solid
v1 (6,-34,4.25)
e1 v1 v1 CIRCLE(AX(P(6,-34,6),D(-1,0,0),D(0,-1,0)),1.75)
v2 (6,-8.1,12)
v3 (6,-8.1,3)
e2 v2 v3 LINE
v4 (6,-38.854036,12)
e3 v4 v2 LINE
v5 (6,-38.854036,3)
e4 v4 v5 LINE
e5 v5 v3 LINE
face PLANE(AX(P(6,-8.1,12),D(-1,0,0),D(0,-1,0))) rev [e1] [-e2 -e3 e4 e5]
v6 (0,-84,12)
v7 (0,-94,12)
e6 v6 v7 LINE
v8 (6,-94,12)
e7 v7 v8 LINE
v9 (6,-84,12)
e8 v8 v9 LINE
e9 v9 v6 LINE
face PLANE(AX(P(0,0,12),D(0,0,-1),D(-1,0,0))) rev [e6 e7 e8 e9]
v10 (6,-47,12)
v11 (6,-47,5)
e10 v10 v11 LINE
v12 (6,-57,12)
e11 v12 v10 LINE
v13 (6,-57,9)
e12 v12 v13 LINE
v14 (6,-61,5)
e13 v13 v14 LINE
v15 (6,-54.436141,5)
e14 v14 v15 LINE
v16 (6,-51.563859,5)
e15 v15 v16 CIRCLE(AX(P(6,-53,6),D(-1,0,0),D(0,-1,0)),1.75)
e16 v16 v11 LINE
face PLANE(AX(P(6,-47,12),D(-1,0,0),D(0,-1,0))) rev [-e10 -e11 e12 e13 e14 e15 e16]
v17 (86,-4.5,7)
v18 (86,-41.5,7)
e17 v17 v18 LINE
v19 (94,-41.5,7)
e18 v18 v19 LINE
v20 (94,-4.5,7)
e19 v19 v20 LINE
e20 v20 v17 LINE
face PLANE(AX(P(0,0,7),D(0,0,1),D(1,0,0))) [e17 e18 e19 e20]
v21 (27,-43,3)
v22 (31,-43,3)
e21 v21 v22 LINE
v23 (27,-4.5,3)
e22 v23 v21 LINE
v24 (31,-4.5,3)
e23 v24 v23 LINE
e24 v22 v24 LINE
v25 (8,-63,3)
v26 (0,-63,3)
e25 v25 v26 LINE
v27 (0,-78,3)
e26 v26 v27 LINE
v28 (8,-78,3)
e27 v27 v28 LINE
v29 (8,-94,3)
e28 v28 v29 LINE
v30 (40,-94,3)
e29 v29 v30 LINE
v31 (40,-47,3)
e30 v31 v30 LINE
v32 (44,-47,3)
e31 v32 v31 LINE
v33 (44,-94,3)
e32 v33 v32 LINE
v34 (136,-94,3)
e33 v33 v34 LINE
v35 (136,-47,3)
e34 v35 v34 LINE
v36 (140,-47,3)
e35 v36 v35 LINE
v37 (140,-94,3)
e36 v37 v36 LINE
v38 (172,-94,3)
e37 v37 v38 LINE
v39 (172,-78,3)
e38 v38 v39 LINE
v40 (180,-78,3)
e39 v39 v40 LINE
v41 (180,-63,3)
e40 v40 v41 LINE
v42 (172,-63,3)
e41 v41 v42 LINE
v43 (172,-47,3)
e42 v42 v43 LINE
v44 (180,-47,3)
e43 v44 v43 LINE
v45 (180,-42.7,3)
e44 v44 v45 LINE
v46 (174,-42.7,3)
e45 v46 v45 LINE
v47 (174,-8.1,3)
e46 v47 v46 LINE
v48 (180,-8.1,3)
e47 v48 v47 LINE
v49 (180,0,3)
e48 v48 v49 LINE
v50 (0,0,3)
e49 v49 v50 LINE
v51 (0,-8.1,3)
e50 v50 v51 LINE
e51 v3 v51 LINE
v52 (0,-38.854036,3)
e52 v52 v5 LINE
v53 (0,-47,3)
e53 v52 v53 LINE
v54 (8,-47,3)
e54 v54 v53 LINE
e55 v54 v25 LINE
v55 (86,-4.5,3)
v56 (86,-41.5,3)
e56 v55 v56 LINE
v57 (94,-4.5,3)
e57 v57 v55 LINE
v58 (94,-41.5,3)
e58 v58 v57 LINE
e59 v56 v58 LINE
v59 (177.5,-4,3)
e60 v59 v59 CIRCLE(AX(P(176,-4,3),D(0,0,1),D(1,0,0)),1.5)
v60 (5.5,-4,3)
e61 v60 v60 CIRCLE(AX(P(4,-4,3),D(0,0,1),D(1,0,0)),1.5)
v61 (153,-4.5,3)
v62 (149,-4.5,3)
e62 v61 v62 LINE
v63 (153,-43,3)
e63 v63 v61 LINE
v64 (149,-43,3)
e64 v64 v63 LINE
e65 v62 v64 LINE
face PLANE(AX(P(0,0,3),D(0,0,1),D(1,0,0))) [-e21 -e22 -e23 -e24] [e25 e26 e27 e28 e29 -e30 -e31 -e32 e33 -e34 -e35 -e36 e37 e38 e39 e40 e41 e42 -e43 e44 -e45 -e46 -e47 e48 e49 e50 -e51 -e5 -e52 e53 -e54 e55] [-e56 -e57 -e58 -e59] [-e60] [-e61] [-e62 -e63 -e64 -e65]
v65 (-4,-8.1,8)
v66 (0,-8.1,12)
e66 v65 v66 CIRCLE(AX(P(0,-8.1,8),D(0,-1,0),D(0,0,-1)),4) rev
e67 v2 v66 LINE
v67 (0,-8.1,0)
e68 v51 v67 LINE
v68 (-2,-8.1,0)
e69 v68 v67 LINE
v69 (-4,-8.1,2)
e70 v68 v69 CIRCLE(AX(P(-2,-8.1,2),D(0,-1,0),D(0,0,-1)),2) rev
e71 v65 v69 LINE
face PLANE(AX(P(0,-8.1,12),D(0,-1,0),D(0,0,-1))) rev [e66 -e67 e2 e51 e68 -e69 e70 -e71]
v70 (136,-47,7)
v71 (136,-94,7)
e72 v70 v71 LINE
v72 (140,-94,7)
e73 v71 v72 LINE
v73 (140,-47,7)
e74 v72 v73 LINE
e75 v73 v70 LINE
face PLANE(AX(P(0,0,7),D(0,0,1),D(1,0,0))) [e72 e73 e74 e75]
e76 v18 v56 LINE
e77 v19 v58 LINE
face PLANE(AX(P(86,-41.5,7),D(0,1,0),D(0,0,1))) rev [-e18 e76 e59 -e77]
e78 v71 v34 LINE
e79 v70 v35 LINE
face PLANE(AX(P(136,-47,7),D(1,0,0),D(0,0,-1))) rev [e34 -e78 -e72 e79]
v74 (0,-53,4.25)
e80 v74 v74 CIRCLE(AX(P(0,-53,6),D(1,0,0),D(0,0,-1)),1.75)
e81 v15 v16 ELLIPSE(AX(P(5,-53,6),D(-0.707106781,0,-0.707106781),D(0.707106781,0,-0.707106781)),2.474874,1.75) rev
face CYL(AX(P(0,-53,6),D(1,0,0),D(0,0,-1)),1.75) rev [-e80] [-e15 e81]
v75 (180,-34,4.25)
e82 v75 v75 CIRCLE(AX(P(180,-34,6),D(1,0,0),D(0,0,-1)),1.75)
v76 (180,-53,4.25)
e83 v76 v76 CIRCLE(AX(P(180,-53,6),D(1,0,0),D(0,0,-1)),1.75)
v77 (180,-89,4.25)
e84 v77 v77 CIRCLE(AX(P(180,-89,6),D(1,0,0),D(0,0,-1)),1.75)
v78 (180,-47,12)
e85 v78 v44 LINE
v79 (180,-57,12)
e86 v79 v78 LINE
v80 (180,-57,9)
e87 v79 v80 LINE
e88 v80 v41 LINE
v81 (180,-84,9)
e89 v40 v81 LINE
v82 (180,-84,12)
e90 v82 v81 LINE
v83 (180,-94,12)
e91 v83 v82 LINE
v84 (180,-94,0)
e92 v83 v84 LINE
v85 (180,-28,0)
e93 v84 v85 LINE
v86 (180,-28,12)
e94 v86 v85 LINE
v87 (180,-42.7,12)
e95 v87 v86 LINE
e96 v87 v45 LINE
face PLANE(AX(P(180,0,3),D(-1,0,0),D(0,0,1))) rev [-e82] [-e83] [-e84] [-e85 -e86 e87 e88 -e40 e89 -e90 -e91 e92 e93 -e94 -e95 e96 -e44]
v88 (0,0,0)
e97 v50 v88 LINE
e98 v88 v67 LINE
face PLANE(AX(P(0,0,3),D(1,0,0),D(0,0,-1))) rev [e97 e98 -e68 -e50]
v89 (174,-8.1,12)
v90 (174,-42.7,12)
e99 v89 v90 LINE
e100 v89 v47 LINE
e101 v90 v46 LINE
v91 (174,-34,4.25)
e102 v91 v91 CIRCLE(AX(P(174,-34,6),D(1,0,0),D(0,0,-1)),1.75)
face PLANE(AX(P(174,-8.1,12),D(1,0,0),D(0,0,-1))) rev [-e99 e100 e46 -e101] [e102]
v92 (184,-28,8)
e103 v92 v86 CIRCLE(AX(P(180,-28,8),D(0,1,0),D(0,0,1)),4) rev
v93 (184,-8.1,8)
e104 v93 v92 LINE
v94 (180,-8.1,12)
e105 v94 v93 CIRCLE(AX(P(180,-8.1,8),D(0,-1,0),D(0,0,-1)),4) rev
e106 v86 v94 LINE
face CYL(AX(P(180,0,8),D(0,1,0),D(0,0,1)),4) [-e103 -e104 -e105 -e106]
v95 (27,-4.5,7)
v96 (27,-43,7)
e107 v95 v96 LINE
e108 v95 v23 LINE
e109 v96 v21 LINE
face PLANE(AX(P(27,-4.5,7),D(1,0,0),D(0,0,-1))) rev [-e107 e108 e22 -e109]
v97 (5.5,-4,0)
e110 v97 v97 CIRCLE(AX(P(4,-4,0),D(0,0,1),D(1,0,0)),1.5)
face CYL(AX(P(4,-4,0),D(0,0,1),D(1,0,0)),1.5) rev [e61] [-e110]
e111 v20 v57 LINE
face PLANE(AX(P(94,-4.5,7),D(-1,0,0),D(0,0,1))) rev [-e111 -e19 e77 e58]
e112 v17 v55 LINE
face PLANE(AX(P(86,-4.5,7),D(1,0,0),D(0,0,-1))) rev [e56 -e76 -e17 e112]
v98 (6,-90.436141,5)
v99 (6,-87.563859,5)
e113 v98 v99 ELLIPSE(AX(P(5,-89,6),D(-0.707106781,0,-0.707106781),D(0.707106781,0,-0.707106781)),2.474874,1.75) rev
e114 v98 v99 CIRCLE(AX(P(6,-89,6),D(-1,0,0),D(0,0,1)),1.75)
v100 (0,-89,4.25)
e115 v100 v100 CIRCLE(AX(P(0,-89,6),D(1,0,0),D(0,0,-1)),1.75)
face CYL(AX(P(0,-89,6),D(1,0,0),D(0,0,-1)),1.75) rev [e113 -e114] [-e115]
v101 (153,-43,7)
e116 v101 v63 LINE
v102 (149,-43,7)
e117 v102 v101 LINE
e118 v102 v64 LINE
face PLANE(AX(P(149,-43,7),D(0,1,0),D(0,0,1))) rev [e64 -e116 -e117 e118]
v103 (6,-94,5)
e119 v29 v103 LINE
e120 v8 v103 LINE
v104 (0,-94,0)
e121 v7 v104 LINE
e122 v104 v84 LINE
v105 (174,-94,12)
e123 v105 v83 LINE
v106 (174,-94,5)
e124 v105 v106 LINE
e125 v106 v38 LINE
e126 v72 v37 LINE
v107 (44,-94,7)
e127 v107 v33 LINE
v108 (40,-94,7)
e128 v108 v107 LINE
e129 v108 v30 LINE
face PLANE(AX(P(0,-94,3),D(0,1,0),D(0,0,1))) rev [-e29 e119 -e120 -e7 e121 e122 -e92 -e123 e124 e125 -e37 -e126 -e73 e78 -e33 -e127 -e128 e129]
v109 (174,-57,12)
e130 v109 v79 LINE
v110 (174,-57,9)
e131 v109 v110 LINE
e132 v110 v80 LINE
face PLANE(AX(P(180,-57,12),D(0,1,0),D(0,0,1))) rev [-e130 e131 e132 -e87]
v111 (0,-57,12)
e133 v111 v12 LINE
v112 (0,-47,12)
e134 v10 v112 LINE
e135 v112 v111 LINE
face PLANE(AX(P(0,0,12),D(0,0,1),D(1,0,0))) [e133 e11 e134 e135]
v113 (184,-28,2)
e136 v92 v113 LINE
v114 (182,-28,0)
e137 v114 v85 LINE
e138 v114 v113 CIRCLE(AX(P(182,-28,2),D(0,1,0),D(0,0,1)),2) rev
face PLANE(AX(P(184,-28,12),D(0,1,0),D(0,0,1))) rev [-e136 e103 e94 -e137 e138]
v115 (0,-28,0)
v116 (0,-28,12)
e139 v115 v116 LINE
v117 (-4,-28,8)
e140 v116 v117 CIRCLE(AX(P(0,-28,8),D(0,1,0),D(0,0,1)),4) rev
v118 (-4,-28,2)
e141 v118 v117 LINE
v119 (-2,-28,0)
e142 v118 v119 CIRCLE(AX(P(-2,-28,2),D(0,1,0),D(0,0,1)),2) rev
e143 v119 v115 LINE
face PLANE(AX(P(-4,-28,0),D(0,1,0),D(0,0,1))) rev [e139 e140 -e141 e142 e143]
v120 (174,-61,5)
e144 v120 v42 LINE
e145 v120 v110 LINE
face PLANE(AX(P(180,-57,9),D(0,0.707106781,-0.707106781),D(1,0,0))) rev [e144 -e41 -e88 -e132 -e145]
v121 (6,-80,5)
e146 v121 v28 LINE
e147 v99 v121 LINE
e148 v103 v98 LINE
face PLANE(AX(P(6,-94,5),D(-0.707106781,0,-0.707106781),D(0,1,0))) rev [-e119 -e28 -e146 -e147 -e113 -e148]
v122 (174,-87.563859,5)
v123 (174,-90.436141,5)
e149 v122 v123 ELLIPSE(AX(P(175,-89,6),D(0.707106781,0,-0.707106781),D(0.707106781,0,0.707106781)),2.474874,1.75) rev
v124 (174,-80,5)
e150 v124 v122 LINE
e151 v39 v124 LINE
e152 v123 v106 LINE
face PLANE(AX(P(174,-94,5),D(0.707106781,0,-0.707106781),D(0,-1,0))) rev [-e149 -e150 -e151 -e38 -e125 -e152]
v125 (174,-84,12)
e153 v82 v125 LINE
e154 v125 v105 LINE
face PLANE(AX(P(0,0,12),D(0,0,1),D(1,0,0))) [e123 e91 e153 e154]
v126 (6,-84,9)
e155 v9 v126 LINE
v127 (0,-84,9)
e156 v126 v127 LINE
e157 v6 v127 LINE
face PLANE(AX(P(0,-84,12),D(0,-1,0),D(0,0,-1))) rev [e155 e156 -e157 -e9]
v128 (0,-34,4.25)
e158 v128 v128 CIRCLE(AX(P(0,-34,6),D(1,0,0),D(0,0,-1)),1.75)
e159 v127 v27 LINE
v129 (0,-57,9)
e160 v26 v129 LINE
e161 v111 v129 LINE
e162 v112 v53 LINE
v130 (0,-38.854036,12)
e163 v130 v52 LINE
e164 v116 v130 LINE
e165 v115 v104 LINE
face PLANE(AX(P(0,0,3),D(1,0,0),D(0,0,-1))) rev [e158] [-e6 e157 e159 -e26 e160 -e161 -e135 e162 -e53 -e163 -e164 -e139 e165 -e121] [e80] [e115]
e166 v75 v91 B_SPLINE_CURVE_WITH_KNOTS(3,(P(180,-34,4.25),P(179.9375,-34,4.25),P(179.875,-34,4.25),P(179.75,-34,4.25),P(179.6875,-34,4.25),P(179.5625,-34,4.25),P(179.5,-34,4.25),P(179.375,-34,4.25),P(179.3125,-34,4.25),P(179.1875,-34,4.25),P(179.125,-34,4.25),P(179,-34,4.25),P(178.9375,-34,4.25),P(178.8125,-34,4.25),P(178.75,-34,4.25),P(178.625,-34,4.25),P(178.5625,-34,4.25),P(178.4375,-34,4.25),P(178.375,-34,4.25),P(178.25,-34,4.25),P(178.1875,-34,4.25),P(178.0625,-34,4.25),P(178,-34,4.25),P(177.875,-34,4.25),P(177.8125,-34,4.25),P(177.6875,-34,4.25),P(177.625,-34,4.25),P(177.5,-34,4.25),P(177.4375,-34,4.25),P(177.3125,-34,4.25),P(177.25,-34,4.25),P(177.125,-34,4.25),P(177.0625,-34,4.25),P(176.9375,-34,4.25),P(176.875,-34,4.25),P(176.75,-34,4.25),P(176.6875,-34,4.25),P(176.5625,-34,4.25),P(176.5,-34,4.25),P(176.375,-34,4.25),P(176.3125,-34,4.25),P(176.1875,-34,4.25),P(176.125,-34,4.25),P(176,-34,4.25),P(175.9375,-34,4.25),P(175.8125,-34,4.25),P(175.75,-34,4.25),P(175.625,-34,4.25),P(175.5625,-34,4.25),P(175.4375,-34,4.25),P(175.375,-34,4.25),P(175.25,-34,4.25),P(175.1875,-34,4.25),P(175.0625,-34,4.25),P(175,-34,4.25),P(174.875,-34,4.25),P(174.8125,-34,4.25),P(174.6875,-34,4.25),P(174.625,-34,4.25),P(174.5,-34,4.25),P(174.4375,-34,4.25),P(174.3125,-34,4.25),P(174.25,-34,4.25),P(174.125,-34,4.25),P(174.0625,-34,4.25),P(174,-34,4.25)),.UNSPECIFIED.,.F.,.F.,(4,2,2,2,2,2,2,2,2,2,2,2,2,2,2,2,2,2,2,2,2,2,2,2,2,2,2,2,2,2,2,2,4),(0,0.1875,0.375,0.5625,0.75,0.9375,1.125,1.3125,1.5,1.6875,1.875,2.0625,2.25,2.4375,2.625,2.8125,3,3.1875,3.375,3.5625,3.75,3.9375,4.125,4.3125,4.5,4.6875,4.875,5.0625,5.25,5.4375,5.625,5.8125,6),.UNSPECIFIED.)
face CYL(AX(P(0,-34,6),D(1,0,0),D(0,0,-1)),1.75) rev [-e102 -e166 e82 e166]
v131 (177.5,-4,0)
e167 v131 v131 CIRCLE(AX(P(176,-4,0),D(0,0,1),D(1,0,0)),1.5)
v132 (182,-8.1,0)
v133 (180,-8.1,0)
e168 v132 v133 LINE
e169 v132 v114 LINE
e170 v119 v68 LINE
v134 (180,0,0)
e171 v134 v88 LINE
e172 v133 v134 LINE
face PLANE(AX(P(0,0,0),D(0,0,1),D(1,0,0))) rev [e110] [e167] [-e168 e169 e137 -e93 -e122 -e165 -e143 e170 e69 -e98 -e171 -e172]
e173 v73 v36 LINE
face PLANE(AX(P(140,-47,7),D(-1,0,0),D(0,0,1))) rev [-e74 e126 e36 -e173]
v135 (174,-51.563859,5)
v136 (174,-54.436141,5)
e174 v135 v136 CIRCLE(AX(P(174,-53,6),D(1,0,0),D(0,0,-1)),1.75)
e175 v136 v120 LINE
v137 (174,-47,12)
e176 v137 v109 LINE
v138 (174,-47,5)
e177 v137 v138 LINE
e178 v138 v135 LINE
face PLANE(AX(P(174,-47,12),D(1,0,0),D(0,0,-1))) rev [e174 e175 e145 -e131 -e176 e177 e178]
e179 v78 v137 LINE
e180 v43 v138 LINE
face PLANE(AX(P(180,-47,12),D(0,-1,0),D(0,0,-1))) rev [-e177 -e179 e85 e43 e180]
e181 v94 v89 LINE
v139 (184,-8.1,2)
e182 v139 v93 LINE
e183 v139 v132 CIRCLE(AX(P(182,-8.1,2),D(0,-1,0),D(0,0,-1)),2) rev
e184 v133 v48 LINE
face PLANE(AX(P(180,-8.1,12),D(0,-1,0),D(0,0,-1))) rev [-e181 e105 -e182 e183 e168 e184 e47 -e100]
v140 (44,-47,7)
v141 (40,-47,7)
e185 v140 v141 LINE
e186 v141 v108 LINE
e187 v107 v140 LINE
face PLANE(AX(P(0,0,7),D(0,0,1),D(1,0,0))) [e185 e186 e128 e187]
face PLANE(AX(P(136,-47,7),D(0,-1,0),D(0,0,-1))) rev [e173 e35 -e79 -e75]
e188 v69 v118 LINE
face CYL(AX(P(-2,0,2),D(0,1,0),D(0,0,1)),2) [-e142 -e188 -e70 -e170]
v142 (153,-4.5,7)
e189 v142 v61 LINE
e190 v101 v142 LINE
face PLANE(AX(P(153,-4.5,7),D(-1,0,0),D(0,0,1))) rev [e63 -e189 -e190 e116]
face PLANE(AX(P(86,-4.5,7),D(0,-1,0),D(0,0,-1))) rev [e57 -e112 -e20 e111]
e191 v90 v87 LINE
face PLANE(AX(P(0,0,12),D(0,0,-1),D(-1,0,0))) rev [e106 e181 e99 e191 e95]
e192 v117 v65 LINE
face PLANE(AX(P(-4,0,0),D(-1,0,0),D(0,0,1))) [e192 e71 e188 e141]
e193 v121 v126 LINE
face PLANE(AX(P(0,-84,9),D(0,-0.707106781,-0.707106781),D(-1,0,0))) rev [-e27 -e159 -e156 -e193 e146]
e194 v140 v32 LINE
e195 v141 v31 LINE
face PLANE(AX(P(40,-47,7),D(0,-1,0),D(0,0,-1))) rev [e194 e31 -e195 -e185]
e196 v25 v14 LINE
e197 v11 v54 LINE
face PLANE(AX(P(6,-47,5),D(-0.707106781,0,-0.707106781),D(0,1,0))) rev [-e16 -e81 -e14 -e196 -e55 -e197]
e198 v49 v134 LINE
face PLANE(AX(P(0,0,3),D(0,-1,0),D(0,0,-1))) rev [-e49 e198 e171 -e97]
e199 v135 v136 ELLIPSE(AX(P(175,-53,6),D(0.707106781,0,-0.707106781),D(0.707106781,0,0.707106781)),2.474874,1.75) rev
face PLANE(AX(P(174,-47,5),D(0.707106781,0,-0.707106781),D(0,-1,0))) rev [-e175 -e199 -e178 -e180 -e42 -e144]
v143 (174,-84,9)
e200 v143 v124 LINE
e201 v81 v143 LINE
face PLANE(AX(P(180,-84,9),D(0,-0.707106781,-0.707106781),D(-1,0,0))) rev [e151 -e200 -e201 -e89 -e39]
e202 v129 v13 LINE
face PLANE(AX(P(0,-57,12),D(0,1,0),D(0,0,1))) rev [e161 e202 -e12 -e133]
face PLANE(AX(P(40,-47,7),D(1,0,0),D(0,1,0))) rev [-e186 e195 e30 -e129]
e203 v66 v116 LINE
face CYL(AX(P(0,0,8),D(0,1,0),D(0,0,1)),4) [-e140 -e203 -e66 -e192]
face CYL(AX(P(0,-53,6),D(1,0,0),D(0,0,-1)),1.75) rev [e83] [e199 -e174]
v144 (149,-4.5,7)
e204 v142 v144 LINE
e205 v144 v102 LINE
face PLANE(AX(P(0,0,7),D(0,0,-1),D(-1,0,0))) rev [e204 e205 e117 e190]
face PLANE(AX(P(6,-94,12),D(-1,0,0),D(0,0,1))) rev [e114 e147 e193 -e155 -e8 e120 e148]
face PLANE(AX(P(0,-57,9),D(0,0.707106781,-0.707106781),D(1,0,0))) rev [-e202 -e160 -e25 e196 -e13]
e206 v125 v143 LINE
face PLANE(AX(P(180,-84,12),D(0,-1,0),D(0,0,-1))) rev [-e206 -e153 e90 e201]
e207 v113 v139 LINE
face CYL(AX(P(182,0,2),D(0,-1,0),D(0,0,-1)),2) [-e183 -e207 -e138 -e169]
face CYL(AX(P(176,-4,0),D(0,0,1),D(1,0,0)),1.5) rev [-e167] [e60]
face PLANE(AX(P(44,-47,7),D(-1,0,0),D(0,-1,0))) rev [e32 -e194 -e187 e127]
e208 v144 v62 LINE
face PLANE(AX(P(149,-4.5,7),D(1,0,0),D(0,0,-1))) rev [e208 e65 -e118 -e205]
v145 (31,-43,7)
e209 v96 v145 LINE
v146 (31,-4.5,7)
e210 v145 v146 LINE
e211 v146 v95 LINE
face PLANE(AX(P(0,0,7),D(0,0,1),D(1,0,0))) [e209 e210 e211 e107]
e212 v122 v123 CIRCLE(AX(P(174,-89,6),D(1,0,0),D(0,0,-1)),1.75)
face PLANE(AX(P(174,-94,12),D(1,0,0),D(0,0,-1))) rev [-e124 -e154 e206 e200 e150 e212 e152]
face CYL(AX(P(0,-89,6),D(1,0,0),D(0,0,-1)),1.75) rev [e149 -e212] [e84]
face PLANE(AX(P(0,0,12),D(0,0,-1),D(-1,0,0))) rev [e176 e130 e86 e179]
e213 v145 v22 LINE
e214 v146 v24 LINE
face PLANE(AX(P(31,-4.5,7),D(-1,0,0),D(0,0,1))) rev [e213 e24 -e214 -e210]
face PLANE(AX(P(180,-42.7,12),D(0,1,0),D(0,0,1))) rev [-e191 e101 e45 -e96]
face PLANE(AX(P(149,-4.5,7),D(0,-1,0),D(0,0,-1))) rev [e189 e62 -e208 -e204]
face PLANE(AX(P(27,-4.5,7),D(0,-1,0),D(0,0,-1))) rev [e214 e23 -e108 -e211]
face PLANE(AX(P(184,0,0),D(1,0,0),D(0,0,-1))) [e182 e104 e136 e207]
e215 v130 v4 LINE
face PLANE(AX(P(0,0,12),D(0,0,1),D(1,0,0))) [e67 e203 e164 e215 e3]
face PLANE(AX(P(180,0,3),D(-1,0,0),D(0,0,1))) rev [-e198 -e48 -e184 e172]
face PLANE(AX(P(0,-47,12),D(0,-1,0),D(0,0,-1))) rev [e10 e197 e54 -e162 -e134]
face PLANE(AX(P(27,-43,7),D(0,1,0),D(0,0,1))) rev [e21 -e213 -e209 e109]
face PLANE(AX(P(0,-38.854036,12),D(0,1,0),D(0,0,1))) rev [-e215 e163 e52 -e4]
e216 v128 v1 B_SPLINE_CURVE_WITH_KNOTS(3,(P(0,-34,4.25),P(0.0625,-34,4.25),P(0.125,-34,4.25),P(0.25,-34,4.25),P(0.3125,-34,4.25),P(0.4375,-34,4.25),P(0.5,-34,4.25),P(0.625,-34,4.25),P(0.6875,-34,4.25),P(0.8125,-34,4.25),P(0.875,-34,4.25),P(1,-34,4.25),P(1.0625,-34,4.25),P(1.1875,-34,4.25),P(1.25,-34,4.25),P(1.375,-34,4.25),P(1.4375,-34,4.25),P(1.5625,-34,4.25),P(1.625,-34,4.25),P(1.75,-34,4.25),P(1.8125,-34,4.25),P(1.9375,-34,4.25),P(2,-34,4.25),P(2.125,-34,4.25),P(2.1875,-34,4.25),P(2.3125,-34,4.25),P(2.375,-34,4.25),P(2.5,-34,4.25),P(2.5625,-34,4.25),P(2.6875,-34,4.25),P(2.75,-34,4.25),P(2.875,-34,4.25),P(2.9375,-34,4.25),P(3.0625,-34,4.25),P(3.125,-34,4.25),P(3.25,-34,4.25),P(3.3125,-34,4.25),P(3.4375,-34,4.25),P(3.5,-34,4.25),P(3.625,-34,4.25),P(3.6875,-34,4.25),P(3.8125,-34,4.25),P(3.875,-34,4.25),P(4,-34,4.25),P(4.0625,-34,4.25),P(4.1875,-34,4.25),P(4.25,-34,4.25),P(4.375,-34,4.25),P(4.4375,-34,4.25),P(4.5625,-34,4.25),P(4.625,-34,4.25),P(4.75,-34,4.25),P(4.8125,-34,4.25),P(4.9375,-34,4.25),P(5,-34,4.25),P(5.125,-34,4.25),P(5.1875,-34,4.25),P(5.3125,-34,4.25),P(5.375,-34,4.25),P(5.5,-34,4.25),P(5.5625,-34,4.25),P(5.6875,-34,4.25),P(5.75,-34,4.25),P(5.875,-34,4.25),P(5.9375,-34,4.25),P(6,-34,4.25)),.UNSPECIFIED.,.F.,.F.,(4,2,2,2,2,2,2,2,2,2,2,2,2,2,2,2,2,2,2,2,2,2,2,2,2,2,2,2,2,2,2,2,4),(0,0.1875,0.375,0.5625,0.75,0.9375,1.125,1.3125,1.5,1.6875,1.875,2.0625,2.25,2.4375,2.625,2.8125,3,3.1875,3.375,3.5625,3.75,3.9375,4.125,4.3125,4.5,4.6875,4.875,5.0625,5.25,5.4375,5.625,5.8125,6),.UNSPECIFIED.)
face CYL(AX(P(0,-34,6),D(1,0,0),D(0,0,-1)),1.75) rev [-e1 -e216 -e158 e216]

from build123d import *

# Parameters (mm, degrees)
SKETCH_1_W          = 180
SKETCH_1_H          = 94
EXTRUDE_1_DEPTH     = 3
SKETCH_2_W          = 6
SKETCH_2_H          = 10
SKETCH_2_H_2        = 34.6
SKETCH_2_H_3        = 30.754035876
EXTRUDE_2_DEPTH     = 9
CHAMFER_2_SIZE      = 6
CHAMFER_1_SIZE      = 6
SKETCH_3_R          = 1.75
CUT_EXTRUDE_1_DEPTH = 204.420746238
SKETCH_4_R          = 1.5
CUT_EXTRUDE_2_DEPTH = 204.265835791
SKETCH_5_W          = 4
SKETCH_5_H          = 47
SKETCH_5_H_2        = 38.5
SKETCH_5_W_2        = 8
SKETCH_5_H_3        = 37
EXTRUDE_3_DEPTH     = 4
CHAMFER_3_SIZE      = 2
SKETCH_6_W          = 12
SKETCH_6_H          = 19.9
EXTRUDE_4_DEPTH     = 4
FILLET_1_R          = 4
SKETCH_7_W          = 12
SKETCH_7_H          = 19.9
EXTRUDE_5_DEPTH     = 4
FILLET_2_R          = 4
FILLET_3_R          = 2


with BuildPart() as part:
    # Эскиз1 → Бобышка-Вытянуть1 (new body)
    with BuildSketch(Plane.XY):
        with Locations((90, -47)):
            Rectangle(SKETCH_1_W, SKETCH_1_H)
    extrude(amount=EXTRUDE_1_DEPTH)

    # Эскиз2 → Бобышка-Вытянуть2 (add)
    with BuildSketch(Plane.XY.offset(3)):
        with Locations((3, -89)):
            Rectangle(SKETCH_2_W, SKETCH_2_H)
        with Locations((177, -89)):
            Rectangle(SKETCH_2_W, SKETCH_2_H)
        with Locations((3, -52)):
            Rectangle(SKETCH_2_W, SKETCH_2_H)
        with Locations((177, -52)):
            Rectangle(SKETCH_2_W, SKETCH_2_H)
        with Locations((177, -25.4)):
            Rectangle(SKETCH_2_W, SKETCH_2_H_2)
        with Locations((3, -23.477017938)):
            Rectangle(SKETCH_2_W, SKETCH_2_H_3)
    extrude(amount=EXTRUDE_2_DEPTH)

    # Фаска2
    chamfer_2_edges = [part.edges().sort_by_distance(p)[0] for p in [
        (3, -57, 3),
        (177, -57, 3),
    ]]
    chamfer(chamfer_2_edges, length=CHAMFER_2_SIZE)

    # Фаска1
    chamfer_1_edges = [part.edges().sort_by_distance(p)[0] for p in [
        (3, -84, 3),
        (177, -84, 3),
    ]]
    chamfer(chamfer_1_edges, length=CHAMFER_1_SIZE)

    # Эскиз3 → Вырез-Вытянуть1 (cut, through all)
    with BuildSketch(Plane(origin=(180, 0, 0), x_dir=(0, 0, -1), z_dir=(1, 0, 0))):
        with Locations((-6, -89)):
            Circle(SKETCH_3_R)
        with Locations((-6, -53)):
            Circle(SKETCH_3_R)
        with Locations((-6, -34)):
            Circle(SKETCH_3_R)
    extrude(amount=-CUT_EXTRUDE_1_DEPTH, mode=Mode.SUBTRACT)

    # Эскиз4 → Вырез-Вытянуть2 (cut, through all)
    with BuildSketch(Plane.XY.offset(3)):
        with Locations((4, -4)):
            Circle(SKETCH_4_R)
        with Locations((176, -4)):
            Circle(SKETCH_4_R)
    extrude(amount=-CUT_EXTRUDE_2_DEPTH, mode=Mode.SUBTRACT)

    # Эскиз5 → Бобышка-Вытянуть3 (add)
    with BuildSketch(Plane.XY.offset(3)):
        with Locations((42, -70.5)):
            Rectangle(SKETCH_5_W, SKETCH_5_H)
        with Locations((138, -70.5)):
            Rectangle(SKETCH_5_W, SKETCH_5_H)
        with Locations((29, -23.75)):
            Rectangle(SKETCH_5_W, SKETCH_5_H_2)
        with Locations((151, -23.75)):
            Rectangle(SKETCH_5_W, SKETCH_5_H_2)
        with Locations((90, -23)):
            Rectangle(SKETCH_5_W_2, SKETCH_5_H_3)
    extrude(amount=EXTRUDE_3_DEPTH)

    # Фаска3
    # the kernel refuses this chamfer: 2 mm, written as the material it adds along each edge
    with BuildSketch(Plane(origin=(6, -72.856634024, 3), x_dir=(0.9996219169112968, 0, -0.02749587661058627), z_dir=(0, -1, 0))) as chamfer_3_piece_1_section:
        Polygon((CHAMFER_3_SIZE * 0.999621916911, CHAMFER_3_SIZE * 0.0274958766106), (-CHAMFER_3_SIZE * 0.0274958766106, CHAMFER_3_SIZE * 0.999621916911), (0, 0), align=None)
    chamfer_3_piece_1 = extrude(amount=21.143365976, mode=Mode.PRIVATE)
    chamfer_3_piece_1 = split(chamfer_3_piece_1, bisect_by=Plane(origin=(6.680922071, -82.46162584, 7.46162584), z_dir=(0, -0.7071067811865476, -0.7071067811865476)), keep=Keep.TOP, mode=Mode.PRIVATE)
    chamfer_3_piece_1 = chamfer_3_piece_1 - Plane(origin=(6.680922071, -89, 6), x_dir=(0, 0, -1), z_dir=(1, 0, 0)) * Cylinder(1.75, 51, mode=Mode.PRIVATE)
    add(chamfer_3_piece_1)
    with BuildSketch(Plane(origin=(174, -94, 3), x_dir=(-0.9996219169112968, 0, -0.02749587661058639), z_dir=(0, 1, 0))) as chamfer_3_piece_2_section:
        Polygon((CHAMFER_3_SIZE * 0.999621916911, CHAMFER_3_SIZE * 0.0274958766106), (-CHAMFER_3_SIZE * 0.0274958766106, CHAMFER_3_SIZE * 0.999621916911), (0, 0), align=None)
    chamfer_3_piece_2 = extrude(amount=21.143365976, mode=Mode.PRIVATE)
    chamfer_3_piece_2 = split(chamfer_3_piece_2, bisect_by=Plane(origin=(173.319077929, -82.46162584, 7.46162584), z_dir=(0, -0.7071067811865476, -0.7071067811865476)), keep=Keep.TOP, mode=Mode.PRIVATE)
    chamfer_3_piece_2 = chamfer_3_piece_2 - Plane(origin=(173.319077929, -89, 6), x_dir=(0, 0, -1), z_dir=(1, 0, 0)) * Cylinder(1.75, 51, mode=Mode.PRIVATE)
    add(chamfer_3_piece_2)
    with BuildSketch(Plane(origin=(6, -47, 3), x_dir=(0.9996219169112968, 0, -0.02749587661058627), z_dir=(0, -1, 0))) as chamfer_3_piece_3_section:
        Polygon((CHAMFER_3_SIZE * 0.999621916911, CHAMFER_3_SIZE * 0.0274958766106), (-CHAMFER_3_SIZE * 0.0274958766106, CHAMFER_3_SIZE * 0.999621916911), (0, 0), align=None)
    chamfer_3_piece_3 = extrude(amount=21.143365976, mode=Mode.PRIVATE)
    chamfer_3_piece_3 = split(chamfer_3_piece_3, bisect_by=Plane(origin=(6.680922071, -58.530709151, 7.469290849), z_dir=(0, 0.7071067811865476, -0.7071067811865476)), keep=Keep.TOP, mode=Mode.PRIVATE)
    chamfer_3_piece_3 = chamfer_3_piece_3 - Plane(origin=(6.680922071, -53, 6), x_dir=(0, 0, -1), z_dir=(1, 0, 0)) * Cylinder(1.75, 51, mode=Mode.PRIVATE)
    add(chamfer_3_piece_3)
    with BuildSketch(Plane(origin=(174, -68.143365976, 3), x_dir=(-0.9996219169112968, 0, -0.02749587661058639), z_dir=(0, 1, 0))) as chamfer_3_piece_4_section:
        Polygon((CHAMFER_3_SIZE * 0.999621916911, CHAMFER_3_SIZE * 0.0274958766106), (-CHAMFER_3_SIZE * 0.0274958766106, CHAMFER_3_SIZE * 0.999621916911), (0, 0), align=None)
    chamfer_3_piece_4 = extrude(amount=21.143365976, mode=Mode.PRIVATE)
    chamfer_3_piece_4 = split(chamfer_3_piece_4, bisect_by=Plane(origin=(173.319077929, -58.530709151, 7.469290849), z_dir=(0, 0.7071067811865476, -0.7071067811865476)), keep=Keep.TOP, mode=Mode.PRIVATE)
    chamfer_3_piece_4 = chamfer_3_piece_4 - Plane(origin=(173.319077929, -53, 6), x_dir=(0, 0, -1), z_dir=(1, 0, 0)) * Cylinder(1.75, 51, mode=Mode.PRIVATE)
    add(chamfer_3_piece_4)

    # Эскиз6 → Бобышка-Вытянуть4 (add)
    with BuildSketch(Plane(origin=(180, 0, 0), x_dir=(0, 0, -1), z_dir=(1, 0, 0))):
        with Locations((-6, -18.05)):
            Rectangle(SKETCH_6_W, SKETCH_6_H)
    extrude(amount=EXTRUDE_4_DEPTH)

    # Скругление1
    fillet_1_edges = [part.edges().sort_by_distance(p)[0] for p in [
        (184, -18.05, 12),
    ]]
    fillet(fillet_1_edges, radius=FILLET_1_R)

    # Эскиз7 → Бобышка-Вытянуть5 (add)
    with BuildSketch(Plane.ZY):
        with Locations((6, -18.05)):
            Rectangle(SKETCH_7_W, SKETCH_7_H)
    extrude(amount=EXTRUDE_5_DEPTH)

    # Скругление2
    fillet_2_edges = [part.edges().sort_by_distance(p)[0] for p in [
        (-4, -18.05, 12),
    ]]
    fillet(fillet_2_edges, radius=FILLET_2_R)

    # Скругление3
    fillet_3_edges = [part.edges().sort_by_distance(p)[0] for p in [
        (184, -18.05, 0),
        (-4, -18.05, 0),
    ]]
    fillet(fillet_3_edges, radius=FILLET_3_R)


solid = part.part
